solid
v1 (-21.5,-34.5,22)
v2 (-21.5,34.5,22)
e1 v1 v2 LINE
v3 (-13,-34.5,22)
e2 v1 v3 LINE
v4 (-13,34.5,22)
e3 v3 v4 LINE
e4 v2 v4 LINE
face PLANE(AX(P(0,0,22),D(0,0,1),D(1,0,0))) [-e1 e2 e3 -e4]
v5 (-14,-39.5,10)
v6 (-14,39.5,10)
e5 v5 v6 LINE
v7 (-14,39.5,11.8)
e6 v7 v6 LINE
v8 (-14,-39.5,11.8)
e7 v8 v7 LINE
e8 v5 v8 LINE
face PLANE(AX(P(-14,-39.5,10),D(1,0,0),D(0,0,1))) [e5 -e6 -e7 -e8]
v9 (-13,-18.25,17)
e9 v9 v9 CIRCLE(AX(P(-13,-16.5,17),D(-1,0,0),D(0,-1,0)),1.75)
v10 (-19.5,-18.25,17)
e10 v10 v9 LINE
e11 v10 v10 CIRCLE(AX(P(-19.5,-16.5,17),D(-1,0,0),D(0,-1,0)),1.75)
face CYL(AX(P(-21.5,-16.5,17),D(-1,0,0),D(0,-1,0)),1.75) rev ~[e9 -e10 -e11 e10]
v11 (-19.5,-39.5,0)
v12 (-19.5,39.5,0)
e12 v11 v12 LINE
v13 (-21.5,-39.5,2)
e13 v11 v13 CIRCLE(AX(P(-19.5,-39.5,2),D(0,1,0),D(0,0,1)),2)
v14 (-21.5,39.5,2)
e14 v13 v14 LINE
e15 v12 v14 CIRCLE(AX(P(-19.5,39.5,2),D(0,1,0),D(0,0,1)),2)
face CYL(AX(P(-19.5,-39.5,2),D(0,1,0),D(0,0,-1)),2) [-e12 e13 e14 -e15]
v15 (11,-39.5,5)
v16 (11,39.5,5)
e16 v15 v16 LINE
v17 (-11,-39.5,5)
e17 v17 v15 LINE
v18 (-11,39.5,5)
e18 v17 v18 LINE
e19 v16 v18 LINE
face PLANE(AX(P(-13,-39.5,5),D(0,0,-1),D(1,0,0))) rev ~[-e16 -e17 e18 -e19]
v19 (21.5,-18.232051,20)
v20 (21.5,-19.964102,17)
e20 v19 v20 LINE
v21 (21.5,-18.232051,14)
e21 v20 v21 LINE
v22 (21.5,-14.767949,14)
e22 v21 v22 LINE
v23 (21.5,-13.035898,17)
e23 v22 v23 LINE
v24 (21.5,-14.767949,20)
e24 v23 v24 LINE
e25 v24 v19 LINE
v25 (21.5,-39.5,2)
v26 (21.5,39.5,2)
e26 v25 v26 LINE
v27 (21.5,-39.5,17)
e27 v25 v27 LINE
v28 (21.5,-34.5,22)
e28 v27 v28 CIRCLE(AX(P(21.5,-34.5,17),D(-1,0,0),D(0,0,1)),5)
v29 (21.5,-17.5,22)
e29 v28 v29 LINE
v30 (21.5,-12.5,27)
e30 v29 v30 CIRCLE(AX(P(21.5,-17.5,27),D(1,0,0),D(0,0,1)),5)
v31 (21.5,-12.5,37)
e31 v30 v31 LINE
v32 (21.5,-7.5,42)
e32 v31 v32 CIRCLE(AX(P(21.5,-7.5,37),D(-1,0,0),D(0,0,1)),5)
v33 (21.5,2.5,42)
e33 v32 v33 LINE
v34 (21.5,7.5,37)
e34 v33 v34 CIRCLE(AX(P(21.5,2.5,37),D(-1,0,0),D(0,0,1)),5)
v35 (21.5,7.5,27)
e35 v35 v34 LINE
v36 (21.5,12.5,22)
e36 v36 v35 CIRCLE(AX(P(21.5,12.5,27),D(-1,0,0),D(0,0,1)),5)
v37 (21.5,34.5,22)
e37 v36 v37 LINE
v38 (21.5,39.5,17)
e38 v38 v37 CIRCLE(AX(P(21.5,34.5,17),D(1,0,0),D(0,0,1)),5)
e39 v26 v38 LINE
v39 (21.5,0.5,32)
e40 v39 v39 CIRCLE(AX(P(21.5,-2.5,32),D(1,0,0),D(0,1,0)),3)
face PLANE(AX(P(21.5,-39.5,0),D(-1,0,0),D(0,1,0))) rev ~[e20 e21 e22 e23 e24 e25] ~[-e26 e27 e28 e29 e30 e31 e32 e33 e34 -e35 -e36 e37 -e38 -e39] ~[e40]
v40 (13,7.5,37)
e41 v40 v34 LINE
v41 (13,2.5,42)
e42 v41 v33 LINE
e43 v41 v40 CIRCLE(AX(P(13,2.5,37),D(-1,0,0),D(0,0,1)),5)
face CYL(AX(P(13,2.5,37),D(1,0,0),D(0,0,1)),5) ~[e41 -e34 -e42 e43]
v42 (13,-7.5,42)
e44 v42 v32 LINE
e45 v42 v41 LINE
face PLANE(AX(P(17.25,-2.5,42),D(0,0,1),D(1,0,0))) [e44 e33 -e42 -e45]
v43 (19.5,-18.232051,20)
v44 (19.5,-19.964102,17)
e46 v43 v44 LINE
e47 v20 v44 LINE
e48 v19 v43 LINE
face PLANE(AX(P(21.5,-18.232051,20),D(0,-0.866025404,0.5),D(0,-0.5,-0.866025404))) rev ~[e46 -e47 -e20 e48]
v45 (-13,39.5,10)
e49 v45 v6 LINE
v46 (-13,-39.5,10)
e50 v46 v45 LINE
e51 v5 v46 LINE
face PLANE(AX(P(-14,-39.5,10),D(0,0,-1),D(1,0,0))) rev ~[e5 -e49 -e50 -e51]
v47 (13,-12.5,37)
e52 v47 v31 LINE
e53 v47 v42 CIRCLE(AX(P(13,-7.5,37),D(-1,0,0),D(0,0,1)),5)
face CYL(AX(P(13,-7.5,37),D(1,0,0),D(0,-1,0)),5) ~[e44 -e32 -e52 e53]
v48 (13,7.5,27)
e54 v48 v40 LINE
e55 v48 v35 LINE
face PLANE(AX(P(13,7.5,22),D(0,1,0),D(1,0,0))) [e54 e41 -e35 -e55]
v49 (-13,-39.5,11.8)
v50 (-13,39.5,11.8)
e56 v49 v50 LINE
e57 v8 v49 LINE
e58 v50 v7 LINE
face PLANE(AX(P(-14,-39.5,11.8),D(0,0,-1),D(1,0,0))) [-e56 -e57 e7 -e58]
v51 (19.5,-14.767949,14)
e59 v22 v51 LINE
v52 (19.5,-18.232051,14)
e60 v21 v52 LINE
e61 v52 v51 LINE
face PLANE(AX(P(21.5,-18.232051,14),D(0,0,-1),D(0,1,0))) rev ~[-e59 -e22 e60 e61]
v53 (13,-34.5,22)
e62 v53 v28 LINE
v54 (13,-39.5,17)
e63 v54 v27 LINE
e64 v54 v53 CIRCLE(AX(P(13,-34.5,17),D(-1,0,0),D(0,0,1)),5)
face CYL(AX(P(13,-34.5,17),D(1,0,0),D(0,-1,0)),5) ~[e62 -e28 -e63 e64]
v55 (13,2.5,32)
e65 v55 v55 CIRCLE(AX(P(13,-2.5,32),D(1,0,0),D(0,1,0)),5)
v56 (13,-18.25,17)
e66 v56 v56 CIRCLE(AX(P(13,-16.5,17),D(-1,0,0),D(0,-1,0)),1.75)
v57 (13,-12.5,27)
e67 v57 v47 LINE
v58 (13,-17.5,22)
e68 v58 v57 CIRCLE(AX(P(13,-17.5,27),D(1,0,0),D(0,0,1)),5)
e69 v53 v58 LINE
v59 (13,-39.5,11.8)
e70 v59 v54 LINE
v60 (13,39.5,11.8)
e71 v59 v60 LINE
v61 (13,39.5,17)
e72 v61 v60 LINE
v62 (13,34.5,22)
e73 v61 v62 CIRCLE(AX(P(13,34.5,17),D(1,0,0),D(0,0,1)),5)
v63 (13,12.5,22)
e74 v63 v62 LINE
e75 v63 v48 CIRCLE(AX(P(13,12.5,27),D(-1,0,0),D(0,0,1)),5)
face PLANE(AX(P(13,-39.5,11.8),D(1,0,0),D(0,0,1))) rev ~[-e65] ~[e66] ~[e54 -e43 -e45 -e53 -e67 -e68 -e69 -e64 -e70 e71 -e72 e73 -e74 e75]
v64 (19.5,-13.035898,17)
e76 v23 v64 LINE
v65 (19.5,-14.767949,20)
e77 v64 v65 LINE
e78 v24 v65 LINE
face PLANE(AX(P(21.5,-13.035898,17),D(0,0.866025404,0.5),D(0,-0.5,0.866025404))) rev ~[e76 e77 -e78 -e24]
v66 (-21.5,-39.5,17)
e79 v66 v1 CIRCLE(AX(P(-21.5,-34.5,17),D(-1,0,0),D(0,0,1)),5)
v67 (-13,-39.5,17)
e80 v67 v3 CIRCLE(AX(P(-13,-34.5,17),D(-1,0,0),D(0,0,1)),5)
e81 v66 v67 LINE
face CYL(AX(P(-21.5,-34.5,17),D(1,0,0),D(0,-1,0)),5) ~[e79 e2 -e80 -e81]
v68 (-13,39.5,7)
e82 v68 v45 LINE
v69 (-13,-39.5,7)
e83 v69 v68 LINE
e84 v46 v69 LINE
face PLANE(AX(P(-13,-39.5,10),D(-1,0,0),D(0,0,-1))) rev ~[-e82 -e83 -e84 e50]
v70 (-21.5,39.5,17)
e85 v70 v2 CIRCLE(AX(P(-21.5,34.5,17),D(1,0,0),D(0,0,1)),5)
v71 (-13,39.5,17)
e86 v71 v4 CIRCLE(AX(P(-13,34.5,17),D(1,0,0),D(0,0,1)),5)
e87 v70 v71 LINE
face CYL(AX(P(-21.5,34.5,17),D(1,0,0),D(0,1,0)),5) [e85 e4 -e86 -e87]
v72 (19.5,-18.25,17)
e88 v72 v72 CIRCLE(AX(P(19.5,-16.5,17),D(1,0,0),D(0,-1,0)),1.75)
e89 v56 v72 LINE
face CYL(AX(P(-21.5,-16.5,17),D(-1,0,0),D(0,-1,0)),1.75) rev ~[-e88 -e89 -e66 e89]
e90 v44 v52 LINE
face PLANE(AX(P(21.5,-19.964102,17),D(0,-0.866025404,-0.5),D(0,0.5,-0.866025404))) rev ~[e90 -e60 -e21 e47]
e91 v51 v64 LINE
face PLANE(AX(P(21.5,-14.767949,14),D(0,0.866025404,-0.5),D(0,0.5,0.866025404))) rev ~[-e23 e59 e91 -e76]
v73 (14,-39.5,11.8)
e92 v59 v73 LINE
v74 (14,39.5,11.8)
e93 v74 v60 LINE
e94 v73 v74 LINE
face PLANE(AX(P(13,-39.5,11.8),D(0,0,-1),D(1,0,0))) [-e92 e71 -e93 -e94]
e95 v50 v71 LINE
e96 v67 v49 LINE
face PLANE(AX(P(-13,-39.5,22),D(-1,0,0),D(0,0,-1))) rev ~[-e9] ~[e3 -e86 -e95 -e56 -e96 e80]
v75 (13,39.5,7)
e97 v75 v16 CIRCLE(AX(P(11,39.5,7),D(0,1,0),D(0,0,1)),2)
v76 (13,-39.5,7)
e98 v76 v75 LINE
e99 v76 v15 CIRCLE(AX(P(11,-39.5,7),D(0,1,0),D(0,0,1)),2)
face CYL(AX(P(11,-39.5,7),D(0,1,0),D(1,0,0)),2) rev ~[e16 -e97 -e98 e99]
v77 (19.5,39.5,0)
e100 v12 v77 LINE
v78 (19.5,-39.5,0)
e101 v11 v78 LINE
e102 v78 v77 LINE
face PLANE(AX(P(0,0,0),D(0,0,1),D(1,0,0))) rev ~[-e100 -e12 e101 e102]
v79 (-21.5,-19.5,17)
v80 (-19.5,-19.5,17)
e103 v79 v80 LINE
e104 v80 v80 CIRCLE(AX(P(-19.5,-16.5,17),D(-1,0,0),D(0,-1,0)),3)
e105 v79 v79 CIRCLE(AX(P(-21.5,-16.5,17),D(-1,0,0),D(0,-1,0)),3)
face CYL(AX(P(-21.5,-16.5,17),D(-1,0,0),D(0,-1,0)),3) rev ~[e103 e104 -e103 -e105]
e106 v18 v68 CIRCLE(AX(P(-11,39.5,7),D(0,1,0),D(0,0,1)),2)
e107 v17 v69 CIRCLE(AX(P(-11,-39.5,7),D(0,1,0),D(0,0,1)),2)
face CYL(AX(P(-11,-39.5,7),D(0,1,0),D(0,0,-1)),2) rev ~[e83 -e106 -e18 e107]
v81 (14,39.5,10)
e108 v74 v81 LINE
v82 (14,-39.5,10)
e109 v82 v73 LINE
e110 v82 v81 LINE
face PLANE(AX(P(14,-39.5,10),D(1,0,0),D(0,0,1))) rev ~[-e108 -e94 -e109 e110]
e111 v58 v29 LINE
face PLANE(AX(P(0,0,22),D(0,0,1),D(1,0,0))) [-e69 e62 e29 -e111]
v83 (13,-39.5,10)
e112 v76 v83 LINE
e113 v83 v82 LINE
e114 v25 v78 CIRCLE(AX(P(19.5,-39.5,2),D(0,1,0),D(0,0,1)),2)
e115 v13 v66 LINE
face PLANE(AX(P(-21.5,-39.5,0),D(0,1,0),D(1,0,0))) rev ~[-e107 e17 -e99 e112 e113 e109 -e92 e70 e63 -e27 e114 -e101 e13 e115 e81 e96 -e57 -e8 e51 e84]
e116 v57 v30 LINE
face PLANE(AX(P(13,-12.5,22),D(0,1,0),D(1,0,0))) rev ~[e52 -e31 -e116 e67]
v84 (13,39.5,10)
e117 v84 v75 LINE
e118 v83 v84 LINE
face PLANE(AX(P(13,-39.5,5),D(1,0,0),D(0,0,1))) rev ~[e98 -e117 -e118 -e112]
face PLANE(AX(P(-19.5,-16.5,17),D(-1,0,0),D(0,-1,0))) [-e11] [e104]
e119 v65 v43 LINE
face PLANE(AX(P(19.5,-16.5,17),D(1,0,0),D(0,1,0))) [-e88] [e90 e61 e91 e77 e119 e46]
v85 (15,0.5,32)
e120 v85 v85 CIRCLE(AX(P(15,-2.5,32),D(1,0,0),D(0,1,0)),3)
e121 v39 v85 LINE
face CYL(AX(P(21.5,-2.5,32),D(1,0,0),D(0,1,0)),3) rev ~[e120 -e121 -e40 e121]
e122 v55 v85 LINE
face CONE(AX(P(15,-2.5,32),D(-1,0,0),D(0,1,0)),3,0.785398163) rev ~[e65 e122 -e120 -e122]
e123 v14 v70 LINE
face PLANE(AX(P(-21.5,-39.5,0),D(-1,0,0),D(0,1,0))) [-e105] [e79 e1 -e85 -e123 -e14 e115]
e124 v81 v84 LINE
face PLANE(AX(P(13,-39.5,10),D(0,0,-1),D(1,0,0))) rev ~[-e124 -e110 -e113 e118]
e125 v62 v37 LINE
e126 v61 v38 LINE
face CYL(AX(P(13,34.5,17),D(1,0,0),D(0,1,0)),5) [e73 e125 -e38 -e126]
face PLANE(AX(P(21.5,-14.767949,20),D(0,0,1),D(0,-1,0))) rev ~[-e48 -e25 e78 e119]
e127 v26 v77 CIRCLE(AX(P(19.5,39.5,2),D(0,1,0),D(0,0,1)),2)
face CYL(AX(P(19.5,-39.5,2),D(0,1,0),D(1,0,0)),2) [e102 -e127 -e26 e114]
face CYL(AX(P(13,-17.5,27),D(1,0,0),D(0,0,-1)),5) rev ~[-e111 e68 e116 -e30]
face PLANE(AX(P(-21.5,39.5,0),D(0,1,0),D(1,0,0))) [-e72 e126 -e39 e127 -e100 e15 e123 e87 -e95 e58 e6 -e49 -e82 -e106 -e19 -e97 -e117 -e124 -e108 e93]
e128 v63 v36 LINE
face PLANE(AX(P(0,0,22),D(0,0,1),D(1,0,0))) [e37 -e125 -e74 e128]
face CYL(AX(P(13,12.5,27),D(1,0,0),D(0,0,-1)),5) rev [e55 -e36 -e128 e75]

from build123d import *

# Parameters (mm, degrees)
F0_W      = 43
F0_H      = 79
F0_W_2    = 28
F0_H_2    = 64
F1_DEPTH  = 22
F2_W      = 26
F2_H      = 10.2
F2_H_2    = 1.8
F2_H_3    = 5
F2_W_2    = 1
F3_DEPTH  = 100
F4_R      = 1.75
F5_DEPTH  = 100
F4_R_2    = 3
F6_DEPTH  = 2
F7_R      = 1.75
F8_DEPTH  = 2
F9_W      = 8.5
F9_H      = 20
F10_DEPTH = 20
F11_R     = 3
F12_DEPTH = 25
F13_SIZE  = 2
F14_R     = 5
F15_R     = 2


# Not quite as in the source:
# - a feature names something its author has since deleted; it is built from what else it names


with BuildPart() as f1:
    # F0 (on Top) → F1 (new body)
    with BuildSketch(Plane.XY):
        Rectangle(F0_W, F0_H)
        Rectangle(F0_W_2, F0_H_2, mode=Mode.SUBTRACT)
        Rectangle(F0_W_2, F0_H_2)
    extrude(amount=F1_DEPTH)

    # F2 (on face) → F3 (cut)
    with BuildSketch(Plane.XZ.offset(39.5)):
        with Locations((0, 16.9)):
            Rectangle(F2_W, F2_H)
        with Locations((0, 10.9)):
            Rectangle(F2_W, F2_H_2)
        with Locations((0, 7.5)):
            Rectangle(F2_W, F2_H_3)
        with Locations((-13.5, 10.9)):
            Rectangle(F2_W_2, F2_H_2)
        with Locations((13.5, 10.9)):
            Rectangle(F2_W_2, F2_H_2)
    extrude(amount=-F3_DEPTH, mode=Mode.SUBTRACT)

    # F4 (on face) → F5 (cut)
    with BuildSketch(Plane(origin=(-21.5, 0, 0), x_dir=(0, -1, 0), z_dir=(-1, 0, 0))):
        with Locations((16.5, 17)):
            Circle(F4_R)
    extrude(amount=-F5_DEPTH, mode=Mode.SUBTRACT)

    # F4 (on face) → F6 (cut)
    with BuildSketch(Plane(origin=(-21.5, 0, 0), x_dir=(0, -1, 0), z_dir=(-1, 0, 0))):
        with Locations((16.5, 17)):
            Circle(F4_R_2)
        with Locations((16.5, 17)):
            Circle(F4_R, mode=Mode.SUBTRACT)
    extrude(amount=-F6_DEPTH, mode=Mode.SUBTRACT)

    # F7 (on face) → F8 (cut)
    with BuildSketch(Plane.YZ.offset(21.5)):
        Polygon((-18.2320508076, 14), (-14.7679491924, 14), (-13.0358983849, 17), (-14.7679491924, 20), (-18.2320508076, 20), (-19.9641016151, 17), align=None)
        with Locations((-16.5, 17)):
            Circle(F7_R, mode=Mode.SUBTRACT)
    extrude(amount=-F8_DEPTH, mode=Mode.SUBTRACT)

    # F9 (on face) → F10 (join)
    with BuildSketch(Plane.XY.offset(22)):
        with Locations((17.25, -2.5)):
            Rectangle(F9_W, F9_H)
    extrude(amount=F10_DEPTH)

    # F11 (on face) → F12 (cut)
    with BuildSketch(Plane.YZ.offset(21.5)):
        with Locations((-2.5, 32)):
            Circle(F11_R)
    extrude(amount=-F12_DEPTH, mode=Mode.SUBTRACT)

    # F13
    f13_edges = [f1.edges().sort_by_distance(p)[0] for p in [
        (13, -5.5, 32),
    ]]
    chamfer(f13_edges, length=F13_SIZE)

    # F14
    f14_edges = [f1.edges().sort_by_distance(p)[0] for p in [
        (17.25, 7.5, 42),
        (17.25, -12.5, 42),
        (17.25, -12.5, 22),
        (17.25, 7.5, 22),
        (17.25, 39.5, 22),
        (17.25, -39.5, 22),
        (-17.25, -39.5, 22),
        (-17.25, 39.5, 22),
    ]]
    fillet(f14_edges, radius=F14_R)

    # F15
    f15_edges = [f1.edges().sort_by_distance(p)[0] for p in [
        (13, 0, 5),
        (-13, 0, 5),
        (21.5, 0, 0),
        (-21.5, 0, 0),
    ]]
    fillet(f15_edges, radius=F15_R)


solid = f1.part
